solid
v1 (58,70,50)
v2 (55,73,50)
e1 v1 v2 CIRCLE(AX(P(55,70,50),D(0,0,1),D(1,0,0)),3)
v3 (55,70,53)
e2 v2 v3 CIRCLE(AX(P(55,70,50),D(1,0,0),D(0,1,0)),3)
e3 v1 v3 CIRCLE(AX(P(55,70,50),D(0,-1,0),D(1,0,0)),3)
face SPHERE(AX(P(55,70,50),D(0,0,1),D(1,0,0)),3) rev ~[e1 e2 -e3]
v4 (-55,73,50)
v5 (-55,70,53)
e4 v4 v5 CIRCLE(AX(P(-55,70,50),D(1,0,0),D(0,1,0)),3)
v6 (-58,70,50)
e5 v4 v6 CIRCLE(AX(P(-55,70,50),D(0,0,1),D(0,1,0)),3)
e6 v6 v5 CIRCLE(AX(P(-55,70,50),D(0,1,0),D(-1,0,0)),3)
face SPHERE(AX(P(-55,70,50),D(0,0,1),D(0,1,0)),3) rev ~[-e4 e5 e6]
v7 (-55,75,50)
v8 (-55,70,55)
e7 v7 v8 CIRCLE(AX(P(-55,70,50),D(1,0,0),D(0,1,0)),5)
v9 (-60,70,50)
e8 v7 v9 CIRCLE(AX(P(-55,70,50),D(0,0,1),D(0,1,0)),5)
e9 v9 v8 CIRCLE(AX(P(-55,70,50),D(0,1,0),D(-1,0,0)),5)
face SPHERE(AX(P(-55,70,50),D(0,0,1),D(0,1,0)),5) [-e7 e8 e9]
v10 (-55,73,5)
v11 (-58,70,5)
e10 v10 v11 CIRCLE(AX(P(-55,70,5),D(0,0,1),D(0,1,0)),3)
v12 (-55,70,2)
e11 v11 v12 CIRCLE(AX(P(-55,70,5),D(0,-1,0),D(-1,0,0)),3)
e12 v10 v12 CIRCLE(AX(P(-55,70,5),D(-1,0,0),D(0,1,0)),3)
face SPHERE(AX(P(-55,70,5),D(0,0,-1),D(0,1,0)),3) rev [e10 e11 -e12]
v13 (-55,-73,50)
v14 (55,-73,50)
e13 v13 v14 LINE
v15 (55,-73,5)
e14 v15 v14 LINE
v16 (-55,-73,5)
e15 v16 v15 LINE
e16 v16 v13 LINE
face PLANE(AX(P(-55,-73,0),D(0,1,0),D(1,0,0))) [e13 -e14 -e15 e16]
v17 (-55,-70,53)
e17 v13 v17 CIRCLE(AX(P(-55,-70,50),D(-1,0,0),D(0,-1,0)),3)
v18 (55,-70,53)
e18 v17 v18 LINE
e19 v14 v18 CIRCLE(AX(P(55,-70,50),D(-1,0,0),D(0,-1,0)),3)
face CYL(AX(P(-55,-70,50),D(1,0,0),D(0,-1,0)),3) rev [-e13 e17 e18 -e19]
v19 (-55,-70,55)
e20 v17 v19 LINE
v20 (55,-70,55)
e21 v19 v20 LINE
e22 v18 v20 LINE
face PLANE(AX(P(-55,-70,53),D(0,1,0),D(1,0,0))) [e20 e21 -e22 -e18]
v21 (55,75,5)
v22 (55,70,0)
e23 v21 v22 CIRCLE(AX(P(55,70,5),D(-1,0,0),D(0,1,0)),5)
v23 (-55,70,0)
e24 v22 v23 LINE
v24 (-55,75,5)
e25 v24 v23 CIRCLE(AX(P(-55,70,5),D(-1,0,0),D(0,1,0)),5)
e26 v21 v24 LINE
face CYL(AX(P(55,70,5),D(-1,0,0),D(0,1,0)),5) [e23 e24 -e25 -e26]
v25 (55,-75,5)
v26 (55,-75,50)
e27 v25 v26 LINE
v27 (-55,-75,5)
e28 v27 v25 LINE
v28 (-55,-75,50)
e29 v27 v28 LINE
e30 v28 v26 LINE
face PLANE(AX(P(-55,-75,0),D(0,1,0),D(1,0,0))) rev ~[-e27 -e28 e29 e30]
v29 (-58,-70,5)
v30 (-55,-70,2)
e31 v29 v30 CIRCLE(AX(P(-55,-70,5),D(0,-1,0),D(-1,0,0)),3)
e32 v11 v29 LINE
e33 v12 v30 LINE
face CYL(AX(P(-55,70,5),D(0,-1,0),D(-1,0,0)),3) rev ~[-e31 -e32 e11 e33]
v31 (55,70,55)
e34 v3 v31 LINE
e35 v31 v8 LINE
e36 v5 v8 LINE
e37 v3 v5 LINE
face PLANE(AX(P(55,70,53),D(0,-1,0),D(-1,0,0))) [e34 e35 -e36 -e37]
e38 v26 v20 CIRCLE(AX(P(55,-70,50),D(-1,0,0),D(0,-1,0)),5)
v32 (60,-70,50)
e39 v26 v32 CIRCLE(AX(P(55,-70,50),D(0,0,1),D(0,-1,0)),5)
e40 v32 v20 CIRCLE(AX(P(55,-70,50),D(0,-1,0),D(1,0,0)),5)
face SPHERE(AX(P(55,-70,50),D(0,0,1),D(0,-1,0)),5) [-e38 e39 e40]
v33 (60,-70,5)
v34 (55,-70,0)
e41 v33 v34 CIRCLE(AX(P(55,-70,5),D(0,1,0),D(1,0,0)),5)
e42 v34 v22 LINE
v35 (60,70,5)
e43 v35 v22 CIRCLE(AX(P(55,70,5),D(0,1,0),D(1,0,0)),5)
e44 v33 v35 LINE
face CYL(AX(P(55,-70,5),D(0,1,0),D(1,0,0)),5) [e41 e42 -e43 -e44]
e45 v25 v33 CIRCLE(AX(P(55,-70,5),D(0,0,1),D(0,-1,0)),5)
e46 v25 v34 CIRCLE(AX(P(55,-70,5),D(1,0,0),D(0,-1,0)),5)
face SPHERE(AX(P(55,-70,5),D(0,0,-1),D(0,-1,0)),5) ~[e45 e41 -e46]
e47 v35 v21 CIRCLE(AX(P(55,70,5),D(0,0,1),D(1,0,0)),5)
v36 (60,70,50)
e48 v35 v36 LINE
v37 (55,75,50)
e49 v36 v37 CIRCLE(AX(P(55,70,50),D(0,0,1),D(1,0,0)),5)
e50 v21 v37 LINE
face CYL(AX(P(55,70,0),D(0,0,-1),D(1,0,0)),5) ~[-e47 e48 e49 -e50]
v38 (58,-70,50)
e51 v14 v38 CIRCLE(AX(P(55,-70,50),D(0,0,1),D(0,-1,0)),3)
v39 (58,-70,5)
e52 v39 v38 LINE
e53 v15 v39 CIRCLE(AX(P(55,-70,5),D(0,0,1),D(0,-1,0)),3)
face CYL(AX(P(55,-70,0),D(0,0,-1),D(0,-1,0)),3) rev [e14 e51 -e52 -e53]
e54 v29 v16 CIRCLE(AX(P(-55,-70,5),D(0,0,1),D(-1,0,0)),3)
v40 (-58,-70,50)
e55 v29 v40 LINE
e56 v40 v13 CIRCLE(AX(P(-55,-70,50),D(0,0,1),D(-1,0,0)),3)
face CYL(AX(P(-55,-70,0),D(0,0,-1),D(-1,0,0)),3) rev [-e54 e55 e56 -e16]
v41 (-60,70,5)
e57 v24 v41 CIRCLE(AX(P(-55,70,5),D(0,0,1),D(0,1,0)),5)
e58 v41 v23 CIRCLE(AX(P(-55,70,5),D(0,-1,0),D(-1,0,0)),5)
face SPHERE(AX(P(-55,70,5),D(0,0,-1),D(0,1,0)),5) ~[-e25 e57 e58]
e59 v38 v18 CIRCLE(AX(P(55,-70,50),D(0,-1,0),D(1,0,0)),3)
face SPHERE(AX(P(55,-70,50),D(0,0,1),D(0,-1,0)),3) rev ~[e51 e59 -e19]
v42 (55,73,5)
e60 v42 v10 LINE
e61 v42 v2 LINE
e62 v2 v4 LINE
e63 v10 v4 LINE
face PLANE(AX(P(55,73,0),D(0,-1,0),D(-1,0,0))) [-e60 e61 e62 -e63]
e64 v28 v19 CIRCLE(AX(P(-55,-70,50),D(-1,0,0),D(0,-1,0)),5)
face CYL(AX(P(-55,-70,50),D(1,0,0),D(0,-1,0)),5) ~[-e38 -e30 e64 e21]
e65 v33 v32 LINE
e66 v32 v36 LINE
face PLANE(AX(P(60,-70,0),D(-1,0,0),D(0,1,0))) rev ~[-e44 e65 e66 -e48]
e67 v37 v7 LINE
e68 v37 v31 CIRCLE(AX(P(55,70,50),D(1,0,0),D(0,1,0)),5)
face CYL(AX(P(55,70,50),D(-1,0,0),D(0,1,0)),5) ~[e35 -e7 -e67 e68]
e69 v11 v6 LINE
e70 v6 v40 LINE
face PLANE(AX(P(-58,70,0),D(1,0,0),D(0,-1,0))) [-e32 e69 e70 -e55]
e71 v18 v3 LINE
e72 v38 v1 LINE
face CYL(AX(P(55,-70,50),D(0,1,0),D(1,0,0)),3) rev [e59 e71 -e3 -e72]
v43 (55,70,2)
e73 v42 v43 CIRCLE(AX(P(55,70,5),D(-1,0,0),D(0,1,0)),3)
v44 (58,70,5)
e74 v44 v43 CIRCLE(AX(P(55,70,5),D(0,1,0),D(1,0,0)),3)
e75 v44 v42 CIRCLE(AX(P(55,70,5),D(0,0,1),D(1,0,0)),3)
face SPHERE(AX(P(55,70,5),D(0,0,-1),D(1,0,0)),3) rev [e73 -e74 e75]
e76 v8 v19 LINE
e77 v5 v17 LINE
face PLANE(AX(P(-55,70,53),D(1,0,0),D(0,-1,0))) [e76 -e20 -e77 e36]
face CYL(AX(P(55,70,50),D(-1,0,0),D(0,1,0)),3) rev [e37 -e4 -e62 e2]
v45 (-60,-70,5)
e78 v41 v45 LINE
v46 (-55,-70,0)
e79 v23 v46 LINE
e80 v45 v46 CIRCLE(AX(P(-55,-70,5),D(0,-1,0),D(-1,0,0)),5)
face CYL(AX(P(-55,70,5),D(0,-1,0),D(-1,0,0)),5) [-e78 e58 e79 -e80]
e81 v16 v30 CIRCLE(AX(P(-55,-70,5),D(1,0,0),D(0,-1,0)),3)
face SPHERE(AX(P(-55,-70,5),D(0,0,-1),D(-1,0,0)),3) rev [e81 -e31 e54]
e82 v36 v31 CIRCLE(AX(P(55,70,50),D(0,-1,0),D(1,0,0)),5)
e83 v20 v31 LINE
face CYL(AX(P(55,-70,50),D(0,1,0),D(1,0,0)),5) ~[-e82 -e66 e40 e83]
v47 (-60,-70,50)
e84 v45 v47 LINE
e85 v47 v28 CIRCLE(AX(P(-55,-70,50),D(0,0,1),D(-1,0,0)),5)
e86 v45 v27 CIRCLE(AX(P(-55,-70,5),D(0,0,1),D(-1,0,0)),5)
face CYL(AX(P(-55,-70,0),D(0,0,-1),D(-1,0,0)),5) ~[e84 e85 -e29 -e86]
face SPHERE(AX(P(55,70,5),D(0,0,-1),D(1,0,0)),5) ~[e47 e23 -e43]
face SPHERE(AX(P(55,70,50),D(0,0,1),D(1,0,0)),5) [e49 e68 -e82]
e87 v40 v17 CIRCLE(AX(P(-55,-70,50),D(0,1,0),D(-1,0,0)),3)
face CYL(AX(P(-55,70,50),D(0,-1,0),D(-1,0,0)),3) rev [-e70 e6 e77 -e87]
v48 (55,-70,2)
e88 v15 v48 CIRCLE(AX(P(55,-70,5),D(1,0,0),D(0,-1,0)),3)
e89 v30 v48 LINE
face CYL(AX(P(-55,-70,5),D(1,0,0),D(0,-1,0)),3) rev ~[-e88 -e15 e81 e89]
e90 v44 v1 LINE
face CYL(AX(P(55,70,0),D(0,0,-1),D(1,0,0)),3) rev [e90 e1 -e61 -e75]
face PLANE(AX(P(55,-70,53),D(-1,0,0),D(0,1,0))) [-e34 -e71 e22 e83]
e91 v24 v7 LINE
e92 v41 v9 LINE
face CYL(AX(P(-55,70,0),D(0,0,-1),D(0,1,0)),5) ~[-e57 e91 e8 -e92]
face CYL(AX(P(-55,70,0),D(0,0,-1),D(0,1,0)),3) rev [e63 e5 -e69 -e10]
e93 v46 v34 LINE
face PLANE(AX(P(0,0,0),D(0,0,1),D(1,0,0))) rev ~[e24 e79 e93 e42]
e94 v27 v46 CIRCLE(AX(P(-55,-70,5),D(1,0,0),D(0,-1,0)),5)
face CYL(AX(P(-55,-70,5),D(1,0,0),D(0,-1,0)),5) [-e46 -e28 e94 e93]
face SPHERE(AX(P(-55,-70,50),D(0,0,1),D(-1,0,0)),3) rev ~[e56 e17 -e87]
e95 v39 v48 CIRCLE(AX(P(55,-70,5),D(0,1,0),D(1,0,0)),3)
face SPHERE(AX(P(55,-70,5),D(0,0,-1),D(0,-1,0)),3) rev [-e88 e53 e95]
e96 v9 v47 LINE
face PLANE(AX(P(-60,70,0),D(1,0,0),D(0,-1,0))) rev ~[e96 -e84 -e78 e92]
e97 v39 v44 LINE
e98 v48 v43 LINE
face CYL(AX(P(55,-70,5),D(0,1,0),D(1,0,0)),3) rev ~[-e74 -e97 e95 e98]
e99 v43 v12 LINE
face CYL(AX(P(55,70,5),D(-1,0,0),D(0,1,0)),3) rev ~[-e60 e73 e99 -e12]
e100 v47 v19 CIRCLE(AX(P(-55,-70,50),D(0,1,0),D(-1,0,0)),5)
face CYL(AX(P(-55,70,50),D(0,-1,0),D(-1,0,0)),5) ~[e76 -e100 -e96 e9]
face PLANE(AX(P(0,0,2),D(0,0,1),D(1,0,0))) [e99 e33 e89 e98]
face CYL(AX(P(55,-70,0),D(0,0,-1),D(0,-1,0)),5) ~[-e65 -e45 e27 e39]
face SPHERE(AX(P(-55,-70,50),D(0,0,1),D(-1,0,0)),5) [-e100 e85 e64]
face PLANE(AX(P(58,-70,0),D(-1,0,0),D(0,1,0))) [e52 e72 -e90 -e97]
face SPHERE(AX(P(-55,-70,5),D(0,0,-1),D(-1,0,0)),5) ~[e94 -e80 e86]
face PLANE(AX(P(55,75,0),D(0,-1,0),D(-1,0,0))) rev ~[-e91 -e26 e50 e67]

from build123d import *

# Parameters (mm, degrees)
F1_DEPTH = 55
F2_R     = 5
F3_T     = -2


# Not quite as in the source:
# - a shell that OpenCascade refuses in one call is made with other operations: the cavity is built on its own and cut out


with BuildPart() as f1:
    # F0 (on Top) → F1 (new body)
    with BuildSketch(Plane.XY):
        with BuildLine():
            Line((-55, -75), (55, -75))
            ThreePointArc((55, -75), (58.5355339059, -73.5355339059), (60, -70))
            Line((60, -70), (60, 70))
            ThreePointArc((60, 70), (58.5355339059, 73.5355339059), (55, 75))
            Line((55, 75), (-55, 75))
            ThreePointArc((-55, 75), (-58.5355339059, 73.5355339059), (-60, 70))
            Line((-60, 70), (-60, -70))
            ThreePointArc((-60, -70), (-58.5355339059, -73.5355339059), (-55, -75))
        make_face()
    extrude(amount=F1_DEPTH)

    # F2
    f2_edges = [f1.edges().sort_by_distance(p)[0] for p in [
        (-60, 0, 55),
        (-60, 0, 0),
    ]]
    fillet(f2_edges, radius=F2_R)

    # F3: a shell. OpenCascade refuses it in one call, so the cavity is built on its own and cut out:
    # the body offset inwards by the wall thickness, plus a prism from it out through each open face.
    f3_core = offset(f1.part, amount=F3_T, mode=Mode.PRIVATE)
    f3_exits = [f3_core.faces().sort_by_distance(p)[0] for p in [
        (0, 0, 53),
    ]]
    add(f3_core, mode=Mode.SUBTRACT)
    extrude(f3_exits, amount=-F3_T, mode=Mode.SUBTRACT)


solid = f1.part
